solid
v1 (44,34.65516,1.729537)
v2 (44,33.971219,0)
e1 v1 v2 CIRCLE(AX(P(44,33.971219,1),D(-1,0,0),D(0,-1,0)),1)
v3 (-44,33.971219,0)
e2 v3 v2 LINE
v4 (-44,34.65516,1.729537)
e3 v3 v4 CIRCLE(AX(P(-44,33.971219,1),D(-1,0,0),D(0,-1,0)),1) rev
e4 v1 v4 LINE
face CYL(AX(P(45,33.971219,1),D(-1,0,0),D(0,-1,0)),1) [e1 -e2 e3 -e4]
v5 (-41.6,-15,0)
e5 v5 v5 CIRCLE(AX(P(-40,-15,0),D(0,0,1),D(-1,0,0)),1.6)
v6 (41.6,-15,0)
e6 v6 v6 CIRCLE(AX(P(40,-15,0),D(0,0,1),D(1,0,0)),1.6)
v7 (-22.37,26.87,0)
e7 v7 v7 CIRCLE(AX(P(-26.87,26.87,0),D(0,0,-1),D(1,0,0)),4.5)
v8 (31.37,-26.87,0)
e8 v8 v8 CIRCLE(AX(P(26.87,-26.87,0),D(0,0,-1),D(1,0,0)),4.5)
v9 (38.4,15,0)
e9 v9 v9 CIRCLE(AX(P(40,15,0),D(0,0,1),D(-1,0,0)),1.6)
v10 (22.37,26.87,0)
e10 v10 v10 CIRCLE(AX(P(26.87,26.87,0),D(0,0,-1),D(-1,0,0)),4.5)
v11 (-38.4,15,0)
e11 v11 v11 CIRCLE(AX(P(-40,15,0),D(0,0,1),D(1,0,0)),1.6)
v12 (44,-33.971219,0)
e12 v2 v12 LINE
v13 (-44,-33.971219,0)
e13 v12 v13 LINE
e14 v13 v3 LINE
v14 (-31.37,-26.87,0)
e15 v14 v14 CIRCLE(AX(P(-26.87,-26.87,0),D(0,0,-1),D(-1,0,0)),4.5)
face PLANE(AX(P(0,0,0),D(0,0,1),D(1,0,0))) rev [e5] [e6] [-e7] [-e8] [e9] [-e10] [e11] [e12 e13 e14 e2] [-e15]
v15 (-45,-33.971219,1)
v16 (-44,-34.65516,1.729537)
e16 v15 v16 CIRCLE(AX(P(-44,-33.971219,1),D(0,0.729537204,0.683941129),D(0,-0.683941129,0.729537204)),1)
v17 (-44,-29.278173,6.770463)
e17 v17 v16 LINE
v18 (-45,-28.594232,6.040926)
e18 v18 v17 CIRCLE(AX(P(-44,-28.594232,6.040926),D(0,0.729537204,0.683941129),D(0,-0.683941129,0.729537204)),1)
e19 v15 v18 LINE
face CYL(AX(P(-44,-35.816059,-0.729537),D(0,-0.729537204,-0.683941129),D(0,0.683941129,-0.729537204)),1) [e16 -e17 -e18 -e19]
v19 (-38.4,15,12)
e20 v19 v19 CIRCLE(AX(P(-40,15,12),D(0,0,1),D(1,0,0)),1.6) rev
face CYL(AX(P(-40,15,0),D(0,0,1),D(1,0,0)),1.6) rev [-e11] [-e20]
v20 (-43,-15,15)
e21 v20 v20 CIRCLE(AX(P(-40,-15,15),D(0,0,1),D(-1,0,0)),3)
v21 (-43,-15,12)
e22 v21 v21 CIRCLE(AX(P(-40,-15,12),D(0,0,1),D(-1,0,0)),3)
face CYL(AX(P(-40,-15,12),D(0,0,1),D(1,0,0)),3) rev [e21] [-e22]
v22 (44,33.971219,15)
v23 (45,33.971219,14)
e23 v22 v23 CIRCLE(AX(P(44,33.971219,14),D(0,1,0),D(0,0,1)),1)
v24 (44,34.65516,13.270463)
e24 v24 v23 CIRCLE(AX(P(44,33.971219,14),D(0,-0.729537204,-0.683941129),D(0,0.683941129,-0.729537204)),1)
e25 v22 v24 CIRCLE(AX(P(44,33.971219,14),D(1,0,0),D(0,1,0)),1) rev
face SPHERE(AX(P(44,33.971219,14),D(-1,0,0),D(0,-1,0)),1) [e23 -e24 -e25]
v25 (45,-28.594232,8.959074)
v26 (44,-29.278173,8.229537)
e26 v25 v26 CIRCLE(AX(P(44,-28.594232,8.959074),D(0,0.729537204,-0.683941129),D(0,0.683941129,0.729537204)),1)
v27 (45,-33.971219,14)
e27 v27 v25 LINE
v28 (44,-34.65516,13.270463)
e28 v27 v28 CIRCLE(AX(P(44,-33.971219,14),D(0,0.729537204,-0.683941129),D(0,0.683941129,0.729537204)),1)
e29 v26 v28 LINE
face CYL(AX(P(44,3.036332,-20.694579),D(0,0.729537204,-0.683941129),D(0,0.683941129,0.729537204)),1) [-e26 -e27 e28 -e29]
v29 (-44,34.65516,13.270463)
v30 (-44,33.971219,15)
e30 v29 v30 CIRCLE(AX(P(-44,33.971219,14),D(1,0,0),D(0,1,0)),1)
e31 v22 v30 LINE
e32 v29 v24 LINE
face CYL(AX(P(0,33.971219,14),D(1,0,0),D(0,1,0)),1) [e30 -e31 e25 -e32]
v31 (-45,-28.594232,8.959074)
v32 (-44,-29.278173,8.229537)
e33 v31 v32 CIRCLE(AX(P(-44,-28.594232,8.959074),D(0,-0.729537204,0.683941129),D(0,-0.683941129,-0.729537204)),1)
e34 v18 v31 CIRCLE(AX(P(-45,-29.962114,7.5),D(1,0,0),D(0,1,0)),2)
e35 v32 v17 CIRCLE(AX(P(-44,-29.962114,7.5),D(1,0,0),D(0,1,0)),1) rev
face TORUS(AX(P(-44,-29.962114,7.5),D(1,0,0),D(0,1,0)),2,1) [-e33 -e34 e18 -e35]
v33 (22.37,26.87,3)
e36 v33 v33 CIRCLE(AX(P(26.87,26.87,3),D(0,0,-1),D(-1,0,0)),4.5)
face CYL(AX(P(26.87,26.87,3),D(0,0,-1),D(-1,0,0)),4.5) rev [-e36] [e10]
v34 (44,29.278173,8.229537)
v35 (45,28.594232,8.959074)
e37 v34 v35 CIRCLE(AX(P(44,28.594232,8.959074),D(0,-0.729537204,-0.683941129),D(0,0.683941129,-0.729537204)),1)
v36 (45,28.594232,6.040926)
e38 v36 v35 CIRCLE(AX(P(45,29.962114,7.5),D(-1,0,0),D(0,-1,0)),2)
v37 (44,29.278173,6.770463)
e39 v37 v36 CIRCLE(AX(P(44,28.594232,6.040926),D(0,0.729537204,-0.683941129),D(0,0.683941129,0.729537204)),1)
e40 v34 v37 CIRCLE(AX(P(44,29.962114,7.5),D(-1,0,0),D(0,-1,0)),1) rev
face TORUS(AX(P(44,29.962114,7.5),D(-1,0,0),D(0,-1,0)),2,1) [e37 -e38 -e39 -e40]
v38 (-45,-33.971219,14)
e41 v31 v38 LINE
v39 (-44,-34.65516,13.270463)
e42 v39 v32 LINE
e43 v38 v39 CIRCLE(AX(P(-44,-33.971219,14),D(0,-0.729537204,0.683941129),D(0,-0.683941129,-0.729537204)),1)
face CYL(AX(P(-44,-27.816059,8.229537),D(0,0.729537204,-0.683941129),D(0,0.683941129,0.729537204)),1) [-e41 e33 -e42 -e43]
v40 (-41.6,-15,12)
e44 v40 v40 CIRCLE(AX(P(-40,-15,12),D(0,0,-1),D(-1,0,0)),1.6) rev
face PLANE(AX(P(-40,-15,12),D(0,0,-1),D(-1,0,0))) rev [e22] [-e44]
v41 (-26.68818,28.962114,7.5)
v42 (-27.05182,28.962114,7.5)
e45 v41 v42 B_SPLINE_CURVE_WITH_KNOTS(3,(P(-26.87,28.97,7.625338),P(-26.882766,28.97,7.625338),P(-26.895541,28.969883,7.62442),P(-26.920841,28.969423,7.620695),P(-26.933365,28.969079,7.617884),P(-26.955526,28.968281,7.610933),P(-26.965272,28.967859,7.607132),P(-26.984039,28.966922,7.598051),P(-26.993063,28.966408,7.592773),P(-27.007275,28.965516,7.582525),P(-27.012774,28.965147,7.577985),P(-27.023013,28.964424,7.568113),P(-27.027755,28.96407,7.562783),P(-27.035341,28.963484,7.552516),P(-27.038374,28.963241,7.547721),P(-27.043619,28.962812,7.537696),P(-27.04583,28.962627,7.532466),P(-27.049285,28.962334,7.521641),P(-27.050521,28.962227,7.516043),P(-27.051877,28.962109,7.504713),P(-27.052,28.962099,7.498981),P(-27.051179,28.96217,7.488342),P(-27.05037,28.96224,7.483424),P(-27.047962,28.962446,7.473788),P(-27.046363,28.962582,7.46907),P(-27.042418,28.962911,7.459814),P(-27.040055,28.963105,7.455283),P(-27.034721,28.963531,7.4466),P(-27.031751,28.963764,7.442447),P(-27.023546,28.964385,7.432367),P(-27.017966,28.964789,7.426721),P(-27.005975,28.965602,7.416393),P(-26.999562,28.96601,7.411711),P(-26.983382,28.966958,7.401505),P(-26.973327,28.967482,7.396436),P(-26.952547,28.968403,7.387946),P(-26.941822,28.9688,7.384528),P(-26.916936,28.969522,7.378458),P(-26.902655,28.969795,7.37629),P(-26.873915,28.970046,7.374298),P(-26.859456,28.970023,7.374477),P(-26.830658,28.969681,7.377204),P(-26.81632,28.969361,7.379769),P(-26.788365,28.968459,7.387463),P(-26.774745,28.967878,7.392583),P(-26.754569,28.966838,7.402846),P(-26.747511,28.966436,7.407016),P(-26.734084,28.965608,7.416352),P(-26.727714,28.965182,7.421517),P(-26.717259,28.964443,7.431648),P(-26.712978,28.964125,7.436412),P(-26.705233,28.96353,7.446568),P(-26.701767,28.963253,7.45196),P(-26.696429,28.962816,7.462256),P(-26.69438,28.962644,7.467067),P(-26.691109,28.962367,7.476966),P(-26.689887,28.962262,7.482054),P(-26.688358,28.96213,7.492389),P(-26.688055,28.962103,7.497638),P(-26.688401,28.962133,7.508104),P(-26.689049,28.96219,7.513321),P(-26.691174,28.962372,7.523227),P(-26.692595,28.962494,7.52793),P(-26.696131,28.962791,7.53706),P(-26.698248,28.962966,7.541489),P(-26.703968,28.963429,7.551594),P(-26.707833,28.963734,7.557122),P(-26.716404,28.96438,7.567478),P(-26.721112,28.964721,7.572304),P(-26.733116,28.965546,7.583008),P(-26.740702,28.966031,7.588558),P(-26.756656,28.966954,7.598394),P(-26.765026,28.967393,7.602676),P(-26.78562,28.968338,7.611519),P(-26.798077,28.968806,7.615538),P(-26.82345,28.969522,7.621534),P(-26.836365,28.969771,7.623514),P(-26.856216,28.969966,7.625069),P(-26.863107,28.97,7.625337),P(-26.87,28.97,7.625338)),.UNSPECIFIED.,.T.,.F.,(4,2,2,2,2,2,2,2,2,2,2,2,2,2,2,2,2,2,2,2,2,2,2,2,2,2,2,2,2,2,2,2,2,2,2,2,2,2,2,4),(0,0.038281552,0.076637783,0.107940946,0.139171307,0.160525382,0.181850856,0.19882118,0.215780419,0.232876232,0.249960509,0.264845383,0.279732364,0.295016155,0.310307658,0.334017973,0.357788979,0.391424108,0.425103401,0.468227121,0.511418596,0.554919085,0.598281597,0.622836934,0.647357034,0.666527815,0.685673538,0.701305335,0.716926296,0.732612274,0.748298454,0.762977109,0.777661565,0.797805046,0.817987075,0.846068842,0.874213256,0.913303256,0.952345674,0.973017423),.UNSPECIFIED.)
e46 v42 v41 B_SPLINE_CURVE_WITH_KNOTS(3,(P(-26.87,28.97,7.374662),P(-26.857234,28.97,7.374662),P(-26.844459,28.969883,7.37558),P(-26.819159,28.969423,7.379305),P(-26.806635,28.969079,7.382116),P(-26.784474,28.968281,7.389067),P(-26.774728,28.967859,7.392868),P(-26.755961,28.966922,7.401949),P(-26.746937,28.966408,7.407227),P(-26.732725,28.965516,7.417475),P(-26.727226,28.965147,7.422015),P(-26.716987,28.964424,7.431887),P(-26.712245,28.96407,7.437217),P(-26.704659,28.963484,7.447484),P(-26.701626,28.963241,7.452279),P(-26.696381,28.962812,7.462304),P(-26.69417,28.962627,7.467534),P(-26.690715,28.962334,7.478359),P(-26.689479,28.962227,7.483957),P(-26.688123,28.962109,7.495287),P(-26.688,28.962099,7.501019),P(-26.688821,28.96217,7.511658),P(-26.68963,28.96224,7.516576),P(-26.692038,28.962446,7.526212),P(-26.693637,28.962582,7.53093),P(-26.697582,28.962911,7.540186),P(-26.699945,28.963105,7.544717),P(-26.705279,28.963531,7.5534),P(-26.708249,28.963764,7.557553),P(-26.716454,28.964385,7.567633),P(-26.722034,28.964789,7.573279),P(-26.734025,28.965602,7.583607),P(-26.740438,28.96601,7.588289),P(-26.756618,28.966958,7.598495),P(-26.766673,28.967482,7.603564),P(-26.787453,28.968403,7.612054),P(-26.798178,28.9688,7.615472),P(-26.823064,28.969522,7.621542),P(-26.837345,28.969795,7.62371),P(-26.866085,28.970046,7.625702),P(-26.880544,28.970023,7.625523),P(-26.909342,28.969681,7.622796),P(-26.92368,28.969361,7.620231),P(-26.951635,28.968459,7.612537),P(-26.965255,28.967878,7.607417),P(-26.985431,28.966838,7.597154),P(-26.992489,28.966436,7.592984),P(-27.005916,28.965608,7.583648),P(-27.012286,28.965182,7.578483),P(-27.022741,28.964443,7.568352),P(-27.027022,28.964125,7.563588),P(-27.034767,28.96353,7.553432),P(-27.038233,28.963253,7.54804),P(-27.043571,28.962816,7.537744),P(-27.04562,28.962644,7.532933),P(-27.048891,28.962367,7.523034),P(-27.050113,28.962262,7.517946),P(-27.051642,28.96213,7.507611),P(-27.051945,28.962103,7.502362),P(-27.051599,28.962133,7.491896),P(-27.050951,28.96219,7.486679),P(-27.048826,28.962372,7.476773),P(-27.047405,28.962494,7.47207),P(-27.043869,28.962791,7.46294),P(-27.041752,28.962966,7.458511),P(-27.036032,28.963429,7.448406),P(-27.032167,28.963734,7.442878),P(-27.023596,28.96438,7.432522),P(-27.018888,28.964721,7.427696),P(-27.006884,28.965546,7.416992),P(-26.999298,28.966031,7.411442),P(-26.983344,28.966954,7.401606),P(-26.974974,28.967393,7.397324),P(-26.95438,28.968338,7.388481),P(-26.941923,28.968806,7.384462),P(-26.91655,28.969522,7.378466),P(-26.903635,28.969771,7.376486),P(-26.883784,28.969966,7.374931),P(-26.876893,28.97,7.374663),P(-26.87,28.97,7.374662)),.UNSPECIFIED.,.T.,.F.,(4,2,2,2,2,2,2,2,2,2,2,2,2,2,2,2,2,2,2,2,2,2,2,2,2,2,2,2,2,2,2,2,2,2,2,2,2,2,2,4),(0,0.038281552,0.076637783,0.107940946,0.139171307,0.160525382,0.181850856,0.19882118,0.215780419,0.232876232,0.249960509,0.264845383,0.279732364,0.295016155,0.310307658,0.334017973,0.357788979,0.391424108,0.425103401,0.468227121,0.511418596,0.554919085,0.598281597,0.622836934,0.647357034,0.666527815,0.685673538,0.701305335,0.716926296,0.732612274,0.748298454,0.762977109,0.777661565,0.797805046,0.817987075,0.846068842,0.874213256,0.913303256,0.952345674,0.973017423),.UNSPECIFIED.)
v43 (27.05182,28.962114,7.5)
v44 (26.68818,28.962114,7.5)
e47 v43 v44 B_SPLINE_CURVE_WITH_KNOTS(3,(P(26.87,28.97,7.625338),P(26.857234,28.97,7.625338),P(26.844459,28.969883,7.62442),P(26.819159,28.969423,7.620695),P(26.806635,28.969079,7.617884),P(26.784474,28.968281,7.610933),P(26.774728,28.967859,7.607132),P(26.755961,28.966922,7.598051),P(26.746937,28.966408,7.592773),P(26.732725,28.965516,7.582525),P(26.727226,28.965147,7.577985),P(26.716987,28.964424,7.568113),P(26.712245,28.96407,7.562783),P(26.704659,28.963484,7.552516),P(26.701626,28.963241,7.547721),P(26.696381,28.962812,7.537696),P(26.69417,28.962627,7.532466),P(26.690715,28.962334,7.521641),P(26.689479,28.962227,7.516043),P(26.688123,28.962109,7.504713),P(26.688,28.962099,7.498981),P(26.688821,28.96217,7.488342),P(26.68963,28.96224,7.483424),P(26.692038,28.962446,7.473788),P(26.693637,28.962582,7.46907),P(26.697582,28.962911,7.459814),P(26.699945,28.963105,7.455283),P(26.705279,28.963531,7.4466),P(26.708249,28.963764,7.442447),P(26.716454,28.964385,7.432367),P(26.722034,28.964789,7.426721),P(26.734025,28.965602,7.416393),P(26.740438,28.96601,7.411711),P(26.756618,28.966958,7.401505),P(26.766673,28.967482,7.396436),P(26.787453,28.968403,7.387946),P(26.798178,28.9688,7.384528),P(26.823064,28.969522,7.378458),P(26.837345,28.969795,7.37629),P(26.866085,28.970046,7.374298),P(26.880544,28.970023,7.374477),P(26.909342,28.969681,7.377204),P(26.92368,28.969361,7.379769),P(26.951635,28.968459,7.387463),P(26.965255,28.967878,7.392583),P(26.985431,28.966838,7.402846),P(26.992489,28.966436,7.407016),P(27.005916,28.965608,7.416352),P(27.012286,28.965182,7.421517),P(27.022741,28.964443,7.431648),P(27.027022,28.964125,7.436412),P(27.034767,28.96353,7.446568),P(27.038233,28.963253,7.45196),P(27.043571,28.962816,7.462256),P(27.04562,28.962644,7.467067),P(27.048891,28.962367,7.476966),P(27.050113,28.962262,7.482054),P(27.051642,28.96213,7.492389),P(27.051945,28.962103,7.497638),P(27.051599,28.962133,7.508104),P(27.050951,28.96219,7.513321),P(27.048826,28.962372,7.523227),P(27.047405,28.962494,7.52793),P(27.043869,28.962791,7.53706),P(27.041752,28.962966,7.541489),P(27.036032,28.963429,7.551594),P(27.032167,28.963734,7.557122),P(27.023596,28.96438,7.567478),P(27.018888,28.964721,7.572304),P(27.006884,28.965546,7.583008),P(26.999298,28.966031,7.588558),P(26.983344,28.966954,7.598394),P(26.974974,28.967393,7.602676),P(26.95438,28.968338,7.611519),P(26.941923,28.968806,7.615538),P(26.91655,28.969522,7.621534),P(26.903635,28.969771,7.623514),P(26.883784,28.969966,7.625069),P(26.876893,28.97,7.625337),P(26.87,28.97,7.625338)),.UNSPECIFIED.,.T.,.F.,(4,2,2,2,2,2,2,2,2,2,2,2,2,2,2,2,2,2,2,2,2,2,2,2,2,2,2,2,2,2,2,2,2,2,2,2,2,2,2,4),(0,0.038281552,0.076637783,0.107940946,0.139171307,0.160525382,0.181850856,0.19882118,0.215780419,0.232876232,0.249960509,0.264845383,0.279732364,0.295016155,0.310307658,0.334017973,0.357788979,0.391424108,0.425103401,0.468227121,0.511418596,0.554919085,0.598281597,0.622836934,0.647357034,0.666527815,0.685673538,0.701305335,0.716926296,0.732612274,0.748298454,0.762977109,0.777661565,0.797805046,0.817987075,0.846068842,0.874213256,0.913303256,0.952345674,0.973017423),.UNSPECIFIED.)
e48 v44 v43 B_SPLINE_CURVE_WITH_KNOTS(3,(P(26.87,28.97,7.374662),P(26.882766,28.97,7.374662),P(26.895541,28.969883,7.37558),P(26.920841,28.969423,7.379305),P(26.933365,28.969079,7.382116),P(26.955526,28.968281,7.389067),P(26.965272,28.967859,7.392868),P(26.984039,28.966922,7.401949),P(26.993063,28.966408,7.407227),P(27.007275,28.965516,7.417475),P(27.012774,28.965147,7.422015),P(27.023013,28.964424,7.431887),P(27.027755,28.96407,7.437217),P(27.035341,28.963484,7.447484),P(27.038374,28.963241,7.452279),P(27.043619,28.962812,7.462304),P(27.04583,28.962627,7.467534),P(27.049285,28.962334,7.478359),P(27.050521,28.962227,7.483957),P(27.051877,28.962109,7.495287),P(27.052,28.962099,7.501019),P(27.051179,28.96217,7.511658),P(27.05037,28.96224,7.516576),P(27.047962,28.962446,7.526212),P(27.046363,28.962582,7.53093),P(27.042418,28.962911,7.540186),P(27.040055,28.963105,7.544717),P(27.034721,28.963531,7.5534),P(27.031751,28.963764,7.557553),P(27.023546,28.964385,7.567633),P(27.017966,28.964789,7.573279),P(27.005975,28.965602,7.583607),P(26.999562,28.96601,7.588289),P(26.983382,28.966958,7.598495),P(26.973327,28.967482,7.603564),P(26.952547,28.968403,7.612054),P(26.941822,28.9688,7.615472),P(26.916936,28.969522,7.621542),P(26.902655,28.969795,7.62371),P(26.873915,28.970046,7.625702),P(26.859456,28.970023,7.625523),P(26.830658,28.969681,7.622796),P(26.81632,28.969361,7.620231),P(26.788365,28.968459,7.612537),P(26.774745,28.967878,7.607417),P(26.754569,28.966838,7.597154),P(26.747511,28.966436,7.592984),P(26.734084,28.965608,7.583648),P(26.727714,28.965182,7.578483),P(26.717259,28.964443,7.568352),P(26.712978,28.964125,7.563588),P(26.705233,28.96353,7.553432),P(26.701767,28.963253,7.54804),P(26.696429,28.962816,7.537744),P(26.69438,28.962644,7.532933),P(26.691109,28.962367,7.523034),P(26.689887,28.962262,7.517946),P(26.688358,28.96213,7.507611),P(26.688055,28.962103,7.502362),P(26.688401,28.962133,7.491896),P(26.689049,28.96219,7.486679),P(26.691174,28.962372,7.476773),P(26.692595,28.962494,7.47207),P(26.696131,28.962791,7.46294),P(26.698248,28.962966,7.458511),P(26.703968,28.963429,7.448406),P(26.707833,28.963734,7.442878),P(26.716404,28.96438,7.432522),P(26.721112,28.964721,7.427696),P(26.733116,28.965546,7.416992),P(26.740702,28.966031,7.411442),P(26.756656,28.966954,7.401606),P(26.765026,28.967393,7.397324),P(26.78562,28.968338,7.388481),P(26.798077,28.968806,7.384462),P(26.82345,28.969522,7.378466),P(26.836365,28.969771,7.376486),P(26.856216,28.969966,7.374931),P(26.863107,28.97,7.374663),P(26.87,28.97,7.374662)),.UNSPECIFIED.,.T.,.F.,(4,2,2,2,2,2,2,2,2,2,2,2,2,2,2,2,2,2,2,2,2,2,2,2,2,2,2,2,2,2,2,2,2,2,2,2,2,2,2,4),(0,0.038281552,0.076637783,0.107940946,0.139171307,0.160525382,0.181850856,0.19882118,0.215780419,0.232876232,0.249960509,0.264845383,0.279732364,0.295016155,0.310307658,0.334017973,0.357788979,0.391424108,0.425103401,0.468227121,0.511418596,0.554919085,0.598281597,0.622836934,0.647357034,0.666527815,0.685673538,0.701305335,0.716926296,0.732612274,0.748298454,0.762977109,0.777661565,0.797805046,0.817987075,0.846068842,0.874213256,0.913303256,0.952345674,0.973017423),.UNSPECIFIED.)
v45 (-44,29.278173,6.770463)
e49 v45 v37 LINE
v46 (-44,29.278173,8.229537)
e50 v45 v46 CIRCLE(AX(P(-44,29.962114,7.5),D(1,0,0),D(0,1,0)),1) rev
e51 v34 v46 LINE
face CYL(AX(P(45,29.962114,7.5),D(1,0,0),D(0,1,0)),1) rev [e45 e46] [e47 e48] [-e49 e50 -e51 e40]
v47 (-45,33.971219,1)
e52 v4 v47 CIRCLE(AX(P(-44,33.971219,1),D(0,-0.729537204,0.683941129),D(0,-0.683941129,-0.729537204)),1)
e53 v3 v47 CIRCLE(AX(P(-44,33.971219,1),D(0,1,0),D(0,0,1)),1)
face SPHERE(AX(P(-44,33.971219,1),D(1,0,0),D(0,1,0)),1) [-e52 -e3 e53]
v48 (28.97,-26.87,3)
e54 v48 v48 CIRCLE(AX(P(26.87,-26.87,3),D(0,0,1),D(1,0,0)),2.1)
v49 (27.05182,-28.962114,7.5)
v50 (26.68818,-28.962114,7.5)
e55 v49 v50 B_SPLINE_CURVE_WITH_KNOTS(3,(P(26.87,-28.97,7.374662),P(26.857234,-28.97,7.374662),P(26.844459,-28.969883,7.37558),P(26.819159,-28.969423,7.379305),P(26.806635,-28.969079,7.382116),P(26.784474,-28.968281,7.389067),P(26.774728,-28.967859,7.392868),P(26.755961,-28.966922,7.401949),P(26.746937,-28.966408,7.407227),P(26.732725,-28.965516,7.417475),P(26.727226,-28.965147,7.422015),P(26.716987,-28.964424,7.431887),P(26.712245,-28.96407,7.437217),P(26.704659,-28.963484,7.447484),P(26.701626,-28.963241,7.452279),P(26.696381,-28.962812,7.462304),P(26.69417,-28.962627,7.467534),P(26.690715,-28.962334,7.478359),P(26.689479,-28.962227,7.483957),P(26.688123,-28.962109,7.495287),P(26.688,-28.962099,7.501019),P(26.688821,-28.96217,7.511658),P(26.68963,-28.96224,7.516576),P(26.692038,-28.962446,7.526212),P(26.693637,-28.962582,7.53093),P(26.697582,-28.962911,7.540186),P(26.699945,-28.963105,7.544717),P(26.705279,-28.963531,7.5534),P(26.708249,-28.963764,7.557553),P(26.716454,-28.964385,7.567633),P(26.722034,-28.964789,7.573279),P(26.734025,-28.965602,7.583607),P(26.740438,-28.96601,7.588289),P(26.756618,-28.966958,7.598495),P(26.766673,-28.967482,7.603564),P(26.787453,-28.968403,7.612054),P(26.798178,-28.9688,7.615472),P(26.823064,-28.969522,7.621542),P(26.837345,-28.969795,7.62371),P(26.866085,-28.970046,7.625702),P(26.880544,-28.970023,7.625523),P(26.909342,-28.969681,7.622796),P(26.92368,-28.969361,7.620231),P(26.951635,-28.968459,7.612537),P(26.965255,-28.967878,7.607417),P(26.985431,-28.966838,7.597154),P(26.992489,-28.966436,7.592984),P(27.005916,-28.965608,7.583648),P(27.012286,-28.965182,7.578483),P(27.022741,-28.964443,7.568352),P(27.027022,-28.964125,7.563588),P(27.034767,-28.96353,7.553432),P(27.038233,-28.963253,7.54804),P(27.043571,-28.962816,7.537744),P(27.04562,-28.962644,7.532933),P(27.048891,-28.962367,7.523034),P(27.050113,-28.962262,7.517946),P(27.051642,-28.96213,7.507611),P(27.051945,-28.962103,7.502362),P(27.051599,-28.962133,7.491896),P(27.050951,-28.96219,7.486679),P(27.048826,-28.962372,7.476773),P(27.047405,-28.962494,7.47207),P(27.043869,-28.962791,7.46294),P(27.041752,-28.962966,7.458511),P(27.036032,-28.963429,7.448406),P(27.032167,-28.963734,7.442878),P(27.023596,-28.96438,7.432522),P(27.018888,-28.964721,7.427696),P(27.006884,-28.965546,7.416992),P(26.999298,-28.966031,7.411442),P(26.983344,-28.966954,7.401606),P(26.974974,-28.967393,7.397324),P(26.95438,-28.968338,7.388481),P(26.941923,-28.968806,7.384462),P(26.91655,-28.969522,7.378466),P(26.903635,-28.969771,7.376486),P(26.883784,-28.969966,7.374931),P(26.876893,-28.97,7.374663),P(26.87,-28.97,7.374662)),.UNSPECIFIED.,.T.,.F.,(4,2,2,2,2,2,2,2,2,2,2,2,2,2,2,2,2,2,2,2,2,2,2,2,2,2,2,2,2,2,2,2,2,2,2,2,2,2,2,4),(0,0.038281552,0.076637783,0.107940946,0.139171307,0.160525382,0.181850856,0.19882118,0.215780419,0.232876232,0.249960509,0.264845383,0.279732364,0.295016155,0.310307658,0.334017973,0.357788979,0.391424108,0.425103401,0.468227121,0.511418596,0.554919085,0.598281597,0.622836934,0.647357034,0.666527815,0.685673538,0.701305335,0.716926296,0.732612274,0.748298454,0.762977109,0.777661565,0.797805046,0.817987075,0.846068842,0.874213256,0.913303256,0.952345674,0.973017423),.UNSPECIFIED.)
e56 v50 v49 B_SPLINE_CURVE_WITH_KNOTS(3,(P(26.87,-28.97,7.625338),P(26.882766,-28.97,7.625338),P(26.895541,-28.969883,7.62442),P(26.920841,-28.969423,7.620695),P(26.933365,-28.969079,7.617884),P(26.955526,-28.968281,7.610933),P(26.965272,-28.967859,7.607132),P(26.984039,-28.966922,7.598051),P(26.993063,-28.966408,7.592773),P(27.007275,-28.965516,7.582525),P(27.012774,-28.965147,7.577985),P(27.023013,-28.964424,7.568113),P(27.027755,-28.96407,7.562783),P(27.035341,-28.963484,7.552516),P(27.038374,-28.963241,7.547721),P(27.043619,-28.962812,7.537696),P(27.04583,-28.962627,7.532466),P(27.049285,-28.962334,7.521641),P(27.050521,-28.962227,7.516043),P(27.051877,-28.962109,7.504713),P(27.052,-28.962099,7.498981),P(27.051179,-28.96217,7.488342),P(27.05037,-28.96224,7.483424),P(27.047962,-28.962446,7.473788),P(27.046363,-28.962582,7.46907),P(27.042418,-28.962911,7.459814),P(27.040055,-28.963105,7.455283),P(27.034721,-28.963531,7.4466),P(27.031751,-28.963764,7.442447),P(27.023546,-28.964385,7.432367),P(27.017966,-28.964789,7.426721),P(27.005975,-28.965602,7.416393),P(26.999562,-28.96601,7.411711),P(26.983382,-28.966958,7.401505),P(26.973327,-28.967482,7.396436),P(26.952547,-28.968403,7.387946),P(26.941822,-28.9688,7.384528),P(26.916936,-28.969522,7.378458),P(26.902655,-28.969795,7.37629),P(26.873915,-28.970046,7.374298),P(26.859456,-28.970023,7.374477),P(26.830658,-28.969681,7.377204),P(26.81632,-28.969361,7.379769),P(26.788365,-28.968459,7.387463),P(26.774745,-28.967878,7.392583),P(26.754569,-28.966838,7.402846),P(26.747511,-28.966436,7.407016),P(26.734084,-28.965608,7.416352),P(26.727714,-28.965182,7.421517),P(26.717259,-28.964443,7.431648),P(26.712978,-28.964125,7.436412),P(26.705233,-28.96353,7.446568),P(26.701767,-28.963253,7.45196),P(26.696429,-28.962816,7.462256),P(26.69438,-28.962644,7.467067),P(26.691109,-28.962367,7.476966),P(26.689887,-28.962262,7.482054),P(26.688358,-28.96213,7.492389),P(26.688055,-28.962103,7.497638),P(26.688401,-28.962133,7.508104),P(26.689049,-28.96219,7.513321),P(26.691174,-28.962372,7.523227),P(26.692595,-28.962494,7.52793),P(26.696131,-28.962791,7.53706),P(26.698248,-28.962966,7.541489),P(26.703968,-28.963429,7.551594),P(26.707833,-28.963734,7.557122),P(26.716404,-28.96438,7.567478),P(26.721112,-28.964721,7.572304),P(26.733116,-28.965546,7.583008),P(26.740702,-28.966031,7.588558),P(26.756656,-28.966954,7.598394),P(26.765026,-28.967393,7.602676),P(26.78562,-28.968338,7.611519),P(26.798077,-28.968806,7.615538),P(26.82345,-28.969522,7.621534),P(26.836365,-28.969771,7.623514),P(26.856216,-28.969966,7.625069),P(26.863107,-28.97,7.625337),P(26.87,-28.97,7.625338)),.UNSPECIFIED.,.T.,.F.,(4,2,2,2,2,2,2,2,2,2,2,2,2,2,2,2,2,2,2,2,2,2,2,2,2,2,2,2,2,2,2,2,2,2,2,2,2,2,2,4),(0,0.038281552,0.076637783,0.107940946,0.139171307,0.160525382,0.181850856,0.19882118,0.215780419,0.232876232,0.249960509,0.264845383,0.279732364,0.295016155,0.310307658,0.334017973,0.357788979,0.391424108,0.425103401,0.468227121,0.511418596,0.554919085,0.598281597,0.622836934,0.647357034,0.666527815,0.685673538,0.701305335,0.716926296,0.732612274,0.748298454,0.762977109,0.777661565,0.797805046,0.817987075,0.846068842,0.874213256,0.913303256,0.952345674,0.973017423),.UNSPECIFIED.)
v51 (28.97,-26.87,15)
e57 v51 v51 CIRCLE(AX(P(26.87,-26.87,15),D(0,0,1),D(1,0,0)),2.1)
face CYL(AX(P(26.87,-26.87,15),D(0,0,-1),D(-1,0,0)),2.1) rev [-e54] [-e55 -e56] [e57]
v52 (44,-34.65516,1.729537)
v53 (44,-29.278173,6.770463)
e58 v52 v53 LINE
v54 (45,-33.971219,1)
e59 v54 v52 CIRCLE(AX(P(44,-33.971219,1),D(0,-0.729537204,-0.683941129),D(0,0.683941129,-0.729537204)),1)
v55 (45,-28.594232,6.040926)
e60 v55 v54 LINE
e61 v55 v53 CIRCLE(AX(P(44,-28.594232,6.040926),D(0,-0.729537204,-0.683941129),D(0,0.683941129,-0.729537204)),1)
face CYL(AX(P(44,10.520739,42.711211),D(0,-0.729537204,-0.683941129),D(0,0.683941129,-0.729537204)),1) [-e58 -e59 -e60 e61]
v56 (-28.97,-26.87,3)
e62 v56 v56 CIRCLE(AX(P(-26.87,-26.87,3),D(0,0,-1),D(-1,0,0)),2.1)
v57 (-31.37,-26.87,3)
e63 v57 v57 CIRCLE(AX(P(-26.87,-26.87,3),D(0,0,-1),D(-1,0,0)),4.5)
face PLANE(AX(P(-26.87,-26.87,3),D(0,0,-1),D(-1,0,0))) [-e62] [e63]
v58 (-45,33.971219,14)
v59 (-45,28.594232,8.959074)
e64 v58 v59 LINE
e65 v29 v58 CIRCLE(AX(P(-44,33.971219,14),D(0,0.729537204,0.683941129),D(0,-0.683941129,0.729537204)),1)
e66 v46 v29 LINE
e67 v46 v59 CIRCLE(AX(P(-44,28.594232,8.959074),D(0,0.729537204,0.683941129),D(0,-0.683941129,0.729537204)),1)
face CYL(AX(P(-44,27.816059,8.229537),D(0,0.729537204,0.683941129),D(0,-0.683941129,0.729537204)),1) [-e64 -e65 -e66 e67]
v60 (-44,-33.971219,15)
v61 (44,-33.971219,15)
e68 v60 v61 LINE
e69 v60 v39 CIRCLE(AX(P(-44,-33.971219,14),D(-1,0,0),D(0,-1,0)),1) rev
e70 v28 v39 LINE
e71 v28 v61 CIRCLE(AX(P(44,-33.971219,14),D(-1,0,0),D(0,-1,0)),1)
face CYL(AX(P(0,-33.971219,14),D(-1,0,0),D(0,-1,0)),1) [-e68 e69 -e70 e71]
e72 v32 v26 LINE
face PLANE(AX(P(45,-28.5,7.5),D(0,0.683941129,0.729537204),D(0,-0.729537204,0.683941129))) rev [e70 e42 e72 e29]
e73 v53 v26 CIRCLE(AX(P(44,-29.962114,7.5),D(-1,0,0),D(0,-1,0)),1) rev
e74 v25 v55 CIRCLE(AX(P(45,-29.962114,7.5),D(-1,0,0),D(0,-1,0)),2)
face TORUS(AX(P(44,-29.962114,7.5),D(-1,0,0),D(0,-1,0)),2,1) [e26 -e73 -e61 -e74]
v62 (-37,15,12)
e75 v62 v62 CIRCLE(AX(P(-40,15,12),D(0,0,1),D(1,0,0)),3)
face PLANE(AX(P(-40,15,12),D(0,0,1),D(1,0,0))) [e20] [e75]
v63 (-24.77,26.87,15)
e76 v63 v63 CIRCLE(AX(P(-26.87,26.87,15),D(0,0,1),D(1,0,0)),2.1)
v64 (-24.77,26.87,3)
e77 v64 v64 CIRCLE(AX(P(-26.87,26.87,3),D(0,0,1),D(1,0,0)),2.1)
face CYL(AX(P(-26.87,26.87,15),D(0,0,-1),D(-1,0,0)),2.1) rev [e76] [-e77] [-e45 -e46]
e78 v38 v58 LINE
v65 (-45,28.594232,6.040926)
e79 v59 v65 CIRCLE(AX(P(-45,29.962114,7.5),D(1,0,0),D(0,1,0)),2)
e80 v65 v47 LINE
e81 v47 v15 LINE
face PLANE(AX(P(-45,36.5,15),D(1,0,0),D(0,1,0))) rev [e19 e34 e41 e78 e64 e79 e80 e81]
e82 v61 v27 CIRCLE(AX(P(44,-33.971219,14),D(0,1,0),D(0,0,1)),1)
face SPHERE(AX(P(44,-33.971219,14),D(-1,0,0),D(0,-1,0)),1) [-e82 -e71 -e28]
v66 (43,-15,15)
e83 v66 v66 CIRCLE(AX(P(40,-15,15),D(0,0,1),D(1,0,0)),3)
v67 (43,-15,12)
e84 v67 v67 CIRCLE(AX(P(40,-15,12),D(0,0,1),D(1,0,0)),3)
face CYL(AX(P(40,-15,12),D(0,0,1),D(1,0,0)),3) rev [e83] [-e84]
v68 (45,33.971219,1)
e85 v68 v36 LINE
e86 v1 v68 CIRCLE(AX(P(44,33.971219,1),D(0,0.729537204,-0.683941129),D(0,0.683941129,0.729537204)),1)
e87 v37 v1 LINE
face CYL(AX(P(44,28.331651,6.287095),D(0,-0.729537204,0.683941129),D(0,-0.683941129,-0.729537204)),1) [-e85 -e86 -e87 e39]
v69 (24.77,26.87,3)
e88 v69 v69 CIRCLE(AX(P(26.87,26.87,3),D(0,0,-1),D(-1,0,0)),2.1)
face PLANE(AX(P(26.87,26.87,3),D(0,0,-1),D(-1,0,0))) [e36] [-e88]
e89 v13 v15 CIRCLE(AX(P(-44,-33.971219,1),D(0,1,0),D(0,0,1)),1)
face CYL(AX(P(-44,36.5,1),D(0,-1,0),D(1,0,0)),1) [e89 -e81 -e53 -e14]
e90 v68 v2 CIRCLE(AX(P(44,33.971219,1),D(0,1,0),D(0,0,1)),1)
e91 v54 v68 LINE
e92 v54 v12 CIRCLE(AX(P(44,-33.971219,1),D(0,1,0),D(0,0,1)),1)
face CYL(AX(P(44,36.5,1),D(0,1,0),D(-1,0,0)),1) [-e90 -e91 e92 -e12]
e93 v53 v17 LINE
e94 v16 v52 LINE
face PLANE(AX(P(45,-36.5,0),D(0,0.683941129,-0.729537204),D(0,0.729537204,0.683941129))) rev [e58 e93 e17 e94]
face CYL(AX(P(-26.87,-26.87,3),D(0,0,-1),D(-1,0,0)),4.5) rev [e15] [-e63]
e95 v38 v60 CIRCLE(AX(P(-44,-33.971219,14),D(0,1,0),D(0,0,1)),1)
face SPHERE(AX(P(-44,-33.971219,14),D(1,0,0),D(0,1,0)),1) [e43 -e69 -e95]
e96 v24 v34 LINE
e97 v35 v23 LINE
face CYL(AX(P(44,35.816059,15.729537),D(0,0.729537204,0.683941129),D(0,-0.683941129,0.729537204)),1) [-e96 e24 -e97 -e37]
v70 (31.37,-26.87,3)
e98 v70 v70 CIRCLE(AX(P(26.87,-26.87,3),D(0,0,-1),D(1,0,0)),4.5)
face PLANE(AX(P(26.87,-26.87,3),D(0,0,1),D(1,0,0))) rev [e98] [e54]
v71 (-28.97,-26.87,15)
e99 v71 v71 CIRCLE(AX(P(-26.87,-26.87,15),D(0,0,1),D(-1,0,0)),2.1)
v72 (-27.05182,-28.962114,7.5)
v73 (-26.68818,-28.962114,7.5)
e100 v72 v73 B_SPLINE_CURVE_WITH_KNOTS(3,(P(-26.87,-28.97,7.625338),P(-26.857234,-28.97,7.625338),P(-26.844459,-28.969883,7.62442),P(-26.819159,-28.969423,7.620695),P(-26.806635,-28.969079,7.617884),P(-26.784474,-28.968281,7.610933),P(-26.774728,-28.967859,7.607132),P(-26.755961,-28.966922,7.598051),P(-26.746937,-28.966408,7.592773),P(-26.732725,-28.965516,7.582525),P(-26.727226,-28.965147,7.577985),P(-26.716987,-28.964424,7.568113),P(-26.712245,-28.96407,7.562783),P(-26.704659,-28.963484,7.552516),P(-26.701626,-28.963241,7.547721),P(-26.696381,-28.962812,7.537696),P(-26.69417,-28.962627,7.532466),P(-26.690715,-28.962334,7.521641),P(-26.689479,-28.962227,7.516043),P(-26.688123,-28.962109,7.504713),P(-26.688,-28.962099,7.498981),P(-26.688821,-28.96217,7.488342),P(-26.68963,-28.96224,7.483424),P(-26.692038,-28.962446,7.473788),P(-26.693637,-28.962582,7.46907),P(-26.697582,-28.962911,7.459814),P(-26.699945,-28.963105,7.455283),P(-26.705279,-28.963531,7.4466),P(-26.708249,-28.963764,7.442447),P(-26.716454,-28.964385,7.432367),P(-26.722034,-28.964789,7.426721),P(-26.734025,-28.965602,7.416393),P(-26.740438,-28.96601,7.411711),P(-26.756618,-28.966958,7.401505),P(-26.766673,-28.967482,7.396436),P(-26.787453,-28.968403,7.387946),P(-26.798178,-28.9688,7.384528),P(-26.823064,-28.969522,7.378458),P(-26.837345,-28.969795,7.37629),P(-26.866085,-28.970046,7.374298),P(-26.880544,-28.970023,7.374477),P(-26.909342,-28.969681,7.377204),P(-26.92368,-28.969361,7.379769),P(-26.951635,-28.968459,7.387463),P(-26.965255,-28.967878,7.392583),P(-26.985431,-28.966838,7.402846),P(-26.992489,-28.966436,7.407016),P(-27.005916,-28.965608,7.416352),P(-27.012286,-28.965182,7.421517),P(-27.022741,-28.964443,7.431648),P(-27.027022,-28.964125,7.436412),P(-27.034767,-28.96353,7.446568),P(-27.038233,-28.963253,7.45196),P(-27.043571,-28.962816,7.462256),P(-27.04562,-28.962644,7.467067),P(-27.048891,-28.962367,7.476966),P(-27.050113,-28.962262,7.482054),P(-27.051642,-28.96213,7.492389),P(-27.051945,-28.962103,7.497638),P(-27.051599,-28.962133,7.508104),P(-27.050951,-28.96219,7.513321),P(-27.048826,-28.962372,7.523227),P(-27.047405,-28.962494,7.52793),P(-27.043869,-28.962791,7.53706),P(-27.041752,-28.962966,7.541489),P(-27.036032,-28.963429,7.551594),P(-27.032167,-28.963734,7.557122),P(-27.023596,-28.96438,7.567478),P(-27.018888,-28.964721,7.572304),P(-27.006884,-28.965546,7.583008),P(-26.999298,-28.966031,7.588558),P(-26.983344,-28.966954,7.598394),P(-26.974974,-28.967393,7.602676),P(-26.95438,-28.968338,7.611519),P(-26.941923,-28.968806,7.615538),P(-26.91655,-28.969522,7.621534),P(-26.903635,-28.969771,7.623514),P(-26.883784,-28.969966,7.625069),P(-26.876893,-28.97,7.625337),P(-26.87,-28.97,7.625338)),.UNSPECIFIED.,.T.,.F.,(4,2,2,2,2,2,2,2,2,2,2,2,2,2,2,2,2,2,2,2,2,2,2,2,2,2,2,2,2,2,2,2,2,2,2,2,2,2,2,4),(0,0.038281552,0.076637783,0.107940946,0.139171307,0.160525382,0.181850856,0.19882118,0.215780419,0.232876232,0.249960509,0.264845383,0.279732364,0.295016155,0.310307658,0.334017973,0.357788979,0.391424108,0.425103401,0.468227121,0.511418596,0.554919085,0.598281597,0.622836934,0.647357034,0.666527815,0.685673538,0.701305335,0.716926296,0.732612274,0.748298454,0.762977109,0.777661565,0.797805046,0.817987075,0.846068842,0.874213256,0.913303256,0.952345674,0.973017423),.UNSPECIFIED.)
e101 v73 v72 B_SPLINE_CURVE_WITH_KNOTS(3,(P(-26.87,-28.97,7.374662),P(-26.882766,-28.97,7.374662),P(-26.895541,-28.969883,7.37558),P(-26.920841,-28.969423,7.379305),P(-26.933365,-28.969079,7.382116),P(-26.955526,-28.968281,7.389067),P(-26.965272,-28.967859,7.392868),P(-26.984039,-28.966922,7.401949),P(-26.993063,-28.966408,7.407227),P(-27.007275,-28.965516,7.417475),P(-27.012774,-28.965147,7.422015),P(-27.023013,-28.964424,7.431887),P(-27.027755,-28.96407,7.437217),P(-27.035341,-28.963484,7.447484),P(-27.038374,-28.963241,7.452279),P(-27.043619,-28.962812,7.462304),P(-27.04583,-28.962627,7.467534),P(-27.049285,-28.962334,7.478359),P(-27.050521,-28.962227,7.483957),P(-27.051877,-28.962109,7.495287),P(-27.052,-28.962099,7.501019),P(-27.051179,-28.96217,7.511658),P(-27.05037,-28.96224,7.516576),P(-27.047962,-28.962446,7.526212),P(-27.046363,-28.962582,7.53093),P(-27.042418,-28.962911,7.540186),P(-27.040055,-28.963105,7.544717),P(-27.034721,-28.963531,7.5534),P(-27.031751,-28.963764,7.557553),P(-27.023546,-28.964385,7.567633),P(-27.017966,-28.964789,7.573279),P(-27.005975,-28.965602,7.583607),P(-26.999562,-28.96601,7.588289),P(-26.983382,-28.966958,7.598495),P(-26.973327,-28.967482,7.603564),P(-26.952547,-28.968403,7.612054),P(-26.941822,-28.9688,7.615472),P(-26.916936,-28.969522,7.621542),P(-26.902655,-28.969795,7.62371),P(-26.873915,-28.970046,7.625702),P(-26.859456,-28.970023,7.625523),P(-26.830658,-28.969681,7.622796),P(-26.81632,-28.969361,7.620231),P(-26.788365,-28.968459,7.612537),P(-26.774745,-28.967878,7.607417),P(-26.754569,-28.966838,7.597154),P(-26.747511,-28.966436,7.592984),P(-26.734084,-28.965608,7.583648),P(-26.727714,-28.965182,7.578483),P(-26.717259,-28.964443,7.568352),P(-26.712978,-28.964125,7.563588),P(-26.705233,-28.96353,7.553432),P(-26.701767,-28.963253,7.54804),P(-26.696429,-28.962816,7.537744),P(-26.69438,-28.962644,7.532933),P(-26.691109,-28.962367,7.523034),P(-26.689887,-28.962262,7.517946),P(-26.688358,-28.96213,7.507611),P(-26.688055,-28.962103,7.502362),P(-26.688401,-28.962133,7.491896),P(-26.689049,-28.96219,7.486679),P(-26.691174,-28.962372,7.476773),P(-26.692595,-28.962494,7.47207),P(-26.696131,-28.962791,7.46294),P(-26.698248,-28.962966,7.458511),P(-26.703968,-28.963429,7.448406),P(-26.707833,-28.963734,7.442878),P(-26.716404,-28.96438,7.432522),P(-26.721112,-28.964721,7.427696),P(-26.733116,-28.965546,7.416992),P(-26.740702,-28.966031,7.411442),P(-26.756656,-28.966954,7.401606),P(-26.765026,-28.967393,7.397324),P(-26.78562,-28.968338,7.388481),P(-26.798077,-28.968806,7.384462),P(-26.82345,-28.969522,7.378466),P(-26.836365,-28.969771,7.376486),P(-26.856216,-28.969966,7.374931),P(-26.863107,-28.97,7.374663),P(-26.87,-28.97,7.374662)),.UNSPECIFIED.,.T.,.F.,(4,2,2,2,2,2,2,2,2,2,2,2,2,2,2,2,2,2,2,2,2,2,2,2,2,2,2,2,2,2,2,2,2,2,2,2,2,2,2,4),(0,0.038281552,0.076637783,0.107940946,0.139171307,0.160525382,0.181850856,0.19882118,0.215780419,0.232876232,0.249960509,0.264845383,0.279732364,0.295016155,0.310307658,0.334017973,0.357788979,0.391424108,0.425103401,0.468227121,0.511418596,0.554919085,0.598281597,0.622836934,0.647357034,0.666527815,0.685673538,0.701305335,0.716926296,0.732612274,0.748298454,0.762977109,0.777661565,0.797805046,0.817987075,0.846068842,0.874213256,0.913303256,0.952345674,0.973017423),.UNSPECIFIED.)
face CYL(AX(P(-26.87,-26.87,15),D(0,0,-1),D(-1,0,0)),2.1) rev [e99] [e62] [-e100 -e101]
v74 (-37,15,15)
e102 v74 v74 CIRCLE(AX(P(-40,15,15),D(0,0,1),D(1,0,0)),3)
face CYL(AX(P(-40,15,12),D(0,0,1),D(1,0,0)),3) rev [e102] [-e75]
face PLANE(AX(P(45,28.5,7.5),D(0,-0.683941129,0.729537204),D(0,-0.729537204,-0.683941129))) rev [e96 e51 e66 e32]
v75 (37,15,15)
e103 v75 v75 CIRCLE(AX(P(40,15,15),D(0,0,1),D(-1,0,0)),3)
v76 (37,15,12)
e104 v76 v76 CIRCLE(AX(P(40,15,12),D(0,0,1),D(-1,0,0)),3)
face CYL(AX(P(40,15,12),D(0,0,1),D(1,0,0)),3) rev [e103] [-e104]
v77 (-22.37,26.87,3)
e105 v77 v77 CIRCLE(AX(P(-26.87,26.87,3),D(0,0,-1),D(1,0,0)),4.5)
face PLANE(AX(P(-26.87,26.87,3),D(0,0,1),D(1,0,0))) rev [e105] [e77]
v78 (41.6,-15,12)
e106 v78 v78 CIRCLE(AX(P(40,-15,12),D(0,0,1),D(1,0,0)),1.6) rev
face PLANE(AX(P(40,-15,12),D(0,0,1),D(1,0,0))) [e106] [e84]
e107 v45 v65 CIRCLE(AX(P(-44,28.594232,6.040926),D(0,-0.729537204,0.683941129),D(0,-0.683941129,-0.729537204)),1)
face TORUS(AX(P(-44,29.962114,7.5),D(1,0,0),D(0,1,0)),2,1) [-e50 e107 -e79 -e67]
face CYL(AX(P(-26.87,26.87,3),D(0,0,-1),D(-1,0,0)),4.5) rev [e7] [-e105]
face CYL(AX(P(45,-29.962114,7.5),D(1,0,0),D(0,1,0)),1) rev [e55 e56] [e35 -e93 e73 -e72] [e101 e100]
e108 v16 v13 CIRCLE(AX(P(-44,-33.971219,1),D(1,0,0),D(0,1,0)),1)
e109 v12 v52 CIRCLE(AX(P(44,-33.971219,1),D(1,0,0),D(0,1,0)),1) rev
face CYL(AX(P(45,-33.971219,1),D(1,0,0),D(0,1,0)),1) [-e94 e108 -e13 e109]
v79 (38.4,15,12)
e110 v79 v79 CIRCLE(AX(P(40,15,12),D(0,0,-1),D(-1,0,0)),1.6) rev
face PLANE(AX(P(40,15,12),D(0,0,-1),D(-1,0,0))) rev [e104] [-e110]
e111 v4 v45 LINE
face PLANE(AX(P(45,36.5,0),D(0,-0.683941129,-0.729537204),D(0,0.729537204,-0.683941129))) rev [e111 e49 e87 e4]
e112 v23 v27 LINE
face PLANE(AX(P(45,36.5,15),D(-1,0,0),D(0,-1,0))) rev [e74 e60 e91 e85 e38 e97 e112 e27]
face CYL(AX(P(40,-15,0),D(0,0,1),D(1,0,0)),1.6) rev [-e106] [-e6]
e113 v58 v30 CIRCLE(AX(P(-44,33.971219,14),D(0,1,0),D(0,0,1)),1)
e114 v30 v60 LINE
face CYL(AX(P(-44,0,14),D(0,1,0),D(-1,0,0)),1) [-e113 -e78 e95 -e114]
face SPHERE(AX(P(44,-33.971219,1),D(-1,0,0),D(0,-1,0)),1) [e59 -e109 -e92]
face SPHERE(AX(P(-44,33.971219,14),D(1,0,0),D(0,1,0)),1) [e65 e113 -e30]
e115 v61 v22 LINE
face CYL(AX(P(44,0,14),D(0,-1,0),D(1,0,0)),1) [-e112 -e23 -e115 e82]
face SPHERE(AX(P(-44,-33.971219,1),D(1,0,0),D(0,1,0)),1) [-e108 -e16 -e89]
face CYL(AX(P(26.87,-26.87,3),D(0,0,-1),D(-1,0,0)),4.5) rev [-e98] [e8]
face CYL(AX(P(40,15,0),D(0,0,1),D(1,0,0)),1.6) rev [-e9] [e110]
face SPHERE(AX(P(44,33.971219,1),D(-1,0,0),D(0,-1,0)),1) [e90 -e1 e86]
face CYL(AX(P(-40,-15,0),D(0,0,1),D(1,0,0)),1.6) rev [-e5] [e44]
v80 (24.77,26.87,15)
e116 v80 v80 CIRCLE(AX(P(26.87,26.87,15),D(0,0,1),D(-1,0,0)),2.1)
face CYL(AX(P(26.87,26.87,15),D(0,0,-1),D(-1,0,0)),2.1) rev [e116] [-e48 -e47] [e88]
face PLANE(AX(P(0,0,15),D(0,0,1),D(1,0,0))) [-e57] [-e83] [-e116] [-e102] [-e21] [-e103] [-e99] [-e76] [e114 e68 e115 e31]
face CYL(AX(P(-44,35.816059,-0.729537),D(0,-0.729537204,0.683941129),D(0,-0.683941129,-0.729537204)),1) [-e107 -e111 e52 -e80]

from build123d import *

# Parameters (mm, degrees)
SKETCH_1_W          = 90
SKETCH_1_H          = 73
SKETCH_1_R          = 2.1
EXTRUDE_1_DEPTH     = 15
SKETCH_2_R          = 4.5
CUT_EXTRUDE_1_DEPTH = 3
CUT_EXTRUDE_4_DEPTH = 99.271308122
SKETCH_6_R          = 1.6
CUT_EXTRUDE_5_DEPTH = 60.851900555
SKETCH_7_R          = 3
CUT_EXTRUDE_6_DEPTH = 3
FILLET_5_R          = 1
FILLET_6_R          = 1
FILLET_7_R          = 1
FILLET_8_R          = 1


with BuildPart() as part:
    # 草图1 → 凸台-拉伸1 (new body)
    with BuildSketch(Plane.XY):
        Rectangle(SKETCH_1_W, SKETCH_1_H)
        with Locations((-26.87, 26.87)):
            Circle(SKETCH_1_R, mode=Mode.SUBTRACT)
        with Locations(Location((26.87, 26.87, 0), (0, 0, 180))):
            Circle(SKETCH_1_R, mode=Mode.SUBTRACT)
        with Locations((26.87, -26.87)):
            Circle(SKETCH_1_R, mode=Mode.SUBTRACT)
        with Locations(Location((-26.87, -26.87, 0), (0, 0, 180))):
            Circle(SKETCH_1_R, mode=Mode.SUBTRACT)
    extrude(amount=EXTRUDE_1_DEPTH)

    # 草图2 → 切除-拉伸1 (cut)
    with BuildSketch(Plane(origin=(0, 0, 0), x_dir=(-1, 0, 0), z_dir=(0, 0, -1))):
        with Locations((-26.87, 26.87)):
            Circle(SKETCH_2_R)
        with Locations(Location((26.87, 26.87, 0), (0, 0, 180))):
            Circle(SKETCH_2_R)
        with Locations((26.87, -26.87)):
            Circle(SKETCH_2_R)
        with Locations(Location((-26.87, -26.87, 0), (0, 0, 180))):
            Circle(SKETCH_2_R)
    extrude(amount=-CUT_EXTRUDE_1_DEPTH, mode=Mode.SUBTRACT)

    # 草图5 → 切除-拉伸4 (cut, through all)
    with BuildSketch(Plane.ZY.offset(45)):
        Polygon((0, 36.5), (7.5, 28.5), (15, 36.5), align=None)
        Polygon((0, -36.5), (7.5, -28.5), (15, -36.5), align=None)
    extrude(amount=-CUT_EXTRUDE_4_DEPTH, mode=Mode.SUBTRACT)

    # 草图6 → 切除-拉伸5 (cut, through all)
    with BuildSketch(Plane.XY.offset(15)):
        with Locations((-40, 15)):
            Circle(SKETCH_6_R)
        with Locations(Location((-40, -15, 0), (0, 0, 180))):
            Circle(SKETCH_6_R)
        with Locations((40, -15)):
            Circle(SKETCH_6_R)
        with Locations(Location((40, 15, 0), (0, 0, 180))):
            Circle(SKETCH_6_R)
    extrude(amount=-CUT_EXTRUDE_5_DEPTH, mode=Mode.SUBTRACT)

    # 草图7 → 切除-拉伸6 (cut)
    with BuildSketch(Plane.XY.offset(15)):
        with Locations((-40, 15)):
            Circle(SKETCH_7_R)
        with Locations(Location((-40, -15, 0), (0, 0, 180))):
            Circle(SKETCH_7_R)
        with Locations((40, -15)):
            Circle(SKETCH_7_R)
        with Locations(Location((40, 15, 0), (0, 0, 180))):
            Circle(SKETCH_7_R)
    extrude(amount=-CUT_EXTRUDE_6_DEPTH, mode=Mode.SUBTRACT)

    # 圆角5
    # the kernel refuses this fillet: 1 mm, written as the material it adds along each edge
    with BuildSketch(Plane(origin=(-45, -28.5, 7.5), x_dir=(0, -0.7295372041400846, -0.6839411288813302), z_dir=(1, 0, 0))) as fillet_5_piece_1_section:
        with BuildLine():
            CenterArc((FILLET_5_R * 1.06666666667, -FILLET_5_R), FILLET_5_R, 90, 93.695220532)
            Line((FILLET_5_R * 0.0687456687457, -FILLET_5_R * 1.06444906445), (0, 0))
            Line((0, 0), (FILLET_5_R * 1.06666666667, 0))
        make_face()
    fillet_5_piece_1 = extrude(amount=19.47261984, mode=Mode.PRIVATE)
    fillet_5_piece_1 = fillet_5_piece_1 - Plane(origin=(-26.87, -26.87, 7.500000002), x_dir=(-1, 0, 0), z_dir=(0, 0, -1)) * Cylinder(2.1, 44, mode=Mode.PRIVATE)
    add(fillet_5_piece_1)
    with BuildSketch(Plane(origin=(25.52738016, -28.5, 7.5), x_dir=(0, -0.7295372041400846, -0.6839411288813302), z_dir=(1, 0, 0))) as fillet_5_piece_2_section:
        with BuildLine():
            CenterArc((FILLET_5_R * 1.06666666667, -FILLET_5_R), FILLET_5_R, 90, 93.695220532)
            Line((FILLET_5_R * 0.0687456687457, -FILLET_5_R * 1.06444906445), (0, 0))
            Line((0, 0), (FILLET_5_R * 1.06666666667, 0))
        make_face()
    fillet_5_piece_2 = extrude(amount=19.47261984, mode=Mode.PRIVATE)
    fillet_5_piece_2 = fillet_5_piece_2 - Plane(origin=(26.87, -26.87, 7.500000002), x_dir=(1, 0, 0), z_dir=(0, 0, -1)) * Cylinder(2.1, 44, mode=Mode.PRIVATE)
    add(fillet_5_piece_2)
    with BuildSketch(Plane(origin=(-28.21261984, -28.5, 7.5), x_dir=(0, -0.7295372041400846, -0.6839411288813302), z_dir=(1, 0, 0))) as fillet_5_piece_3_section:
        with BuildLine():
            CenterArc((FILLET_5_R * 1.06666666667, -FILLET_5_R), FILLET_5_R, 90, 93.695220532)
            Line((FILLET_5_R * 0.0687456687457, -FILLET_5_R * 1.06444906445), (0, 0))
            Line((0, 0), (FILLET_5_R * 1.06666666667, 0))
        make_face()
    fillet_5_piece_3 = extrude(amount=56.425239679, mode=Mode.PRIVATE)
    fillet_5_piece_3 = fillet_5_piece_3 - Plane(origin=(-26.87, -26.87, 7.500000001), x_dir=(-1, 0, 0), z_dir=(0, 0, -1)) * Cylinder(2.1, 118, mode=Mode.PRIVATE)
    fillet_5_piece_3 = fillet_5_piece_3 - Plane(origin=(26.87, -26.87, 7.500000001), x_dir=(1, 0, 0), z_dir=(0, 0, -1)) * Cylinder(2.1, 118, mode=Mode.PRIVATE)
    add(fillet_5_piece_3)
    # the kernel refuses this fillet: 1 mm, written as the material it takes off along each edge
    with BuildSketch(Plane(origin=(51.321952033, -36.5, 15), x_dir=(0, 1, 0), z_dir=(-1, 0, 0))) as fillet_5_2_piece_1:
        with BuildLine():
            CenterArc((FILLET_5_R * 2.5287808133, FILLET_5_R), FILLET_5_R, 133.152389734, 136.847610266)
            Line((FILLET_5_R * 1.84483968442, FILLET_5_R * 1.72953720414), (0, 0))
            Line((0, 0), (FILLET_5_R * 2.5287808133, 0))
        make_face()
    extrude(amount=102.643904066, mode=Mode.SUBTRACT)
    with BuildSketch(Plane(origin=(51.321952033, -36.5, 0), x_dir=(0, 1, 0), z_dir=(-1, 0, 0))) as fillet_5_2_piece_2:
        with BuildLine():
            CenterArc((FILLET_5_R * 2.5287808133, -FILLET_5_R), FILLET_5_R, 90, 136.847610266)
            Line((FILLET_5_R * 1.84483968442, -FILLET_5_R * 1.72953720414), (0, 0))
            Line((0, 0), (FILLET_5_R * 2.5287808133, 0))
        make_face()
    extrude(amount=102.643904066, mode=Mode.SUBTRACT)

    # 圆角6
    # the kernel refuses this fillet: 1 mm, written as the material it adds along each edge
    with BuildSketch(Plane(origin=(-28.21261984, 28.5, 7.5), x_dir=(0, 0.729537204140085, -0.6839411288813297), z_dir=(1, 0, 0))) as fillet_6_piece_1_section:
        with BuildLine():
            CenterArc((FILLET_6_R * 1.06666666667, FILLET_6_R), FILLET_6_R, 176.304779468, 93.695220532)
            Line((FILLET_6_R * 0.0687456687457, FILLET_6_R * 1.06444906445), (0, 0))
            Line((0, 0), (FILLET_6_R * 1.06666666667, 0))
        make_face()
    fillet_6_piece_1 = extrude(amount=56.425239679, mode=Mode.PRIVATE)
    fillet_6_piece_1 = fillet_6_piece_1 - Plane(origin=(-26.87, 26.87, 7.499999974), x_dir=(1, 0, 0), z_dir=(0, 0, -1)) * Cylinder(2.1, 118, mode=Mode.PRIVATE)
    fillet_6_piece_1 = fillet_6_piece_1 - Plane(origin=(26.87, 26.87, 7.499999974), x_dir=(-1, 0, 0), z_dir=(0, 0, -1)) * Cylinder(2.1, 118, mode=Mode.PRIVATE)
    add(fillet_6_piece_1)
    with BuildSketch(Plane(origin=(-45, 28.5, 7.5), x_dir=(0, 0.7295372041400854, -0.6839411288813294), z_dir=(1, 0, 0))) as fillet_6_piece_2_section:
        with BuildLine():
            CenterArc((FILLET_6_R * 1.06666666667, FILLET_6_R), FILLET_6_R, 176.304779468, 93.695220532)
            Line((FILLET_6_R * 0.0687456687457, FILLET_6_R * 1.06444906445), (0, 0))
            Line((0, 0), (FILLET_6_R * 1.06666666667, 0))
        make_face()
    fillet_6_piece_2 = extrude(amount=19.47261984, mode=Mode.PRIVATE)
    fillet_6_piece_2 = fillet_6_piece_2 - Plane(origin=(-26.87, 26.87, 7.500000011), x_dir=(1, 0, 0), z_dir=(0, 0, -1)) * Cylinder(2.1, 44, mode=Mode.PRIVATE)
    add(fillet_6_piece_2)
    with BuildSketch(Plane(origin=(25.52738016, 28.5, 7.5), x_dir=(0, 0.729537204140085, -0.6839411288813297), z_dir=(1, 0, 0))) as fillet_6_piece_3_section:
        with BuildLine():
            CenterArc((FILLET_6_R * 1.06666666667, FILLET_6_R), FILLET_6_R, 176.304779468, 93.695220532)
            Line((FILLET_6_R * 0.0687456687457, FILLET_6_R * 1.06444906445), (0, 0))
            Line((0, 0), (FILLET_6_R * 1.06666666667, 0))
        make_face()
    fillet_6_piece_3 = extrude(amount=19.47261984, mode=Mode.PRIVATE)
    fillet_6_piece_3 = fillet_6_piece_3 - Plane(origin=(26.87, 26.87, 7.500000017), x_dir=(-1, 0, 0), z_dir=(0, 0, -1)) * Cylinder(2.1, 44, mode=Mode.PRIVATE)
    add(fillet_6_piece_3)
    # the kernel refuses this fillet: 1 mm, written as the material it takes off along each edge
    with BuildSketch(Plane(origin=(-51.321952033, 36.5, 0), x_dir=(0, -1, 0), z_dir=(1, 0, 0)), Plane(origin=(-51.321952033, 36.5, 15), x_dir=(0, -0.7295372041400834, -0.6839411288813316), z_dir=(1, 0, 0))) as fillet_6_2_piece_1:
        with BuildLine():
            CenterArc((FILLET_6_R * 2.5287808133, -FILLET_6_R), FILLET_6_R, 90, 136.847610266)
            Line((FILLET_6_R * 1.84483968442, -FILLET_6_R * 1.72953720414), (0, 0))
            Line((0, 0), (FILLET_6_R * 2.5287808133, 0))
        make_face()
    extrude(amount=102.643904066, mode=Mode.SUBTRACT)

    # 圆角7
    fillet_7_edges = [part.edges().sort_by_distance(p)[0] for p in [
        (45, -31.966666667, 4.25),
        (45, 0, 15),
        (45, -31.966666667, 10.75),
        (45, 0, 0),
        (45, -34.90114854, 14.367738219),
        (45, -34.90114854, 0.632261781),
        (45, -28.962114147, 7.5),
        (45, 31.966666667, 4.25),
        (45, 31.966666667, 10.75),
        (45, 34.90114854, 14.367738219),
        (45, 34.90114854, 0.632261781),
        (45, 28.962114147, 7.5),
    ]]
    fillet(fillet_7_edges, radius=FILLET_7_R)

    # 圆角8
    fillet_8_edges = [part.edges().sort_by_distance(p)[0] for p in [
        (-45, -31.966666667, 4.25),
        (-45, -31.966666667, 10.75),
        (-45, -34.90114854, 14.367738219),
        (-45, -34.90114854, 0.632261781),
        (-45, -28.962114147, 7.5),
        (-45, 31.966666667, 4.25),
        (-45, 0, 0),
        (-45, 0, 15),
        (-45, 31.966666667, 10.75),
        (-45, 34.90114854, 14.367738219),
        (-45, 34.90114854, 0.632261781),
        (-45, 28.962114147, 7.5),
    ]]
    fillet(fillet_8_edges, radius=FILLET_8_R)


solid = part.part
